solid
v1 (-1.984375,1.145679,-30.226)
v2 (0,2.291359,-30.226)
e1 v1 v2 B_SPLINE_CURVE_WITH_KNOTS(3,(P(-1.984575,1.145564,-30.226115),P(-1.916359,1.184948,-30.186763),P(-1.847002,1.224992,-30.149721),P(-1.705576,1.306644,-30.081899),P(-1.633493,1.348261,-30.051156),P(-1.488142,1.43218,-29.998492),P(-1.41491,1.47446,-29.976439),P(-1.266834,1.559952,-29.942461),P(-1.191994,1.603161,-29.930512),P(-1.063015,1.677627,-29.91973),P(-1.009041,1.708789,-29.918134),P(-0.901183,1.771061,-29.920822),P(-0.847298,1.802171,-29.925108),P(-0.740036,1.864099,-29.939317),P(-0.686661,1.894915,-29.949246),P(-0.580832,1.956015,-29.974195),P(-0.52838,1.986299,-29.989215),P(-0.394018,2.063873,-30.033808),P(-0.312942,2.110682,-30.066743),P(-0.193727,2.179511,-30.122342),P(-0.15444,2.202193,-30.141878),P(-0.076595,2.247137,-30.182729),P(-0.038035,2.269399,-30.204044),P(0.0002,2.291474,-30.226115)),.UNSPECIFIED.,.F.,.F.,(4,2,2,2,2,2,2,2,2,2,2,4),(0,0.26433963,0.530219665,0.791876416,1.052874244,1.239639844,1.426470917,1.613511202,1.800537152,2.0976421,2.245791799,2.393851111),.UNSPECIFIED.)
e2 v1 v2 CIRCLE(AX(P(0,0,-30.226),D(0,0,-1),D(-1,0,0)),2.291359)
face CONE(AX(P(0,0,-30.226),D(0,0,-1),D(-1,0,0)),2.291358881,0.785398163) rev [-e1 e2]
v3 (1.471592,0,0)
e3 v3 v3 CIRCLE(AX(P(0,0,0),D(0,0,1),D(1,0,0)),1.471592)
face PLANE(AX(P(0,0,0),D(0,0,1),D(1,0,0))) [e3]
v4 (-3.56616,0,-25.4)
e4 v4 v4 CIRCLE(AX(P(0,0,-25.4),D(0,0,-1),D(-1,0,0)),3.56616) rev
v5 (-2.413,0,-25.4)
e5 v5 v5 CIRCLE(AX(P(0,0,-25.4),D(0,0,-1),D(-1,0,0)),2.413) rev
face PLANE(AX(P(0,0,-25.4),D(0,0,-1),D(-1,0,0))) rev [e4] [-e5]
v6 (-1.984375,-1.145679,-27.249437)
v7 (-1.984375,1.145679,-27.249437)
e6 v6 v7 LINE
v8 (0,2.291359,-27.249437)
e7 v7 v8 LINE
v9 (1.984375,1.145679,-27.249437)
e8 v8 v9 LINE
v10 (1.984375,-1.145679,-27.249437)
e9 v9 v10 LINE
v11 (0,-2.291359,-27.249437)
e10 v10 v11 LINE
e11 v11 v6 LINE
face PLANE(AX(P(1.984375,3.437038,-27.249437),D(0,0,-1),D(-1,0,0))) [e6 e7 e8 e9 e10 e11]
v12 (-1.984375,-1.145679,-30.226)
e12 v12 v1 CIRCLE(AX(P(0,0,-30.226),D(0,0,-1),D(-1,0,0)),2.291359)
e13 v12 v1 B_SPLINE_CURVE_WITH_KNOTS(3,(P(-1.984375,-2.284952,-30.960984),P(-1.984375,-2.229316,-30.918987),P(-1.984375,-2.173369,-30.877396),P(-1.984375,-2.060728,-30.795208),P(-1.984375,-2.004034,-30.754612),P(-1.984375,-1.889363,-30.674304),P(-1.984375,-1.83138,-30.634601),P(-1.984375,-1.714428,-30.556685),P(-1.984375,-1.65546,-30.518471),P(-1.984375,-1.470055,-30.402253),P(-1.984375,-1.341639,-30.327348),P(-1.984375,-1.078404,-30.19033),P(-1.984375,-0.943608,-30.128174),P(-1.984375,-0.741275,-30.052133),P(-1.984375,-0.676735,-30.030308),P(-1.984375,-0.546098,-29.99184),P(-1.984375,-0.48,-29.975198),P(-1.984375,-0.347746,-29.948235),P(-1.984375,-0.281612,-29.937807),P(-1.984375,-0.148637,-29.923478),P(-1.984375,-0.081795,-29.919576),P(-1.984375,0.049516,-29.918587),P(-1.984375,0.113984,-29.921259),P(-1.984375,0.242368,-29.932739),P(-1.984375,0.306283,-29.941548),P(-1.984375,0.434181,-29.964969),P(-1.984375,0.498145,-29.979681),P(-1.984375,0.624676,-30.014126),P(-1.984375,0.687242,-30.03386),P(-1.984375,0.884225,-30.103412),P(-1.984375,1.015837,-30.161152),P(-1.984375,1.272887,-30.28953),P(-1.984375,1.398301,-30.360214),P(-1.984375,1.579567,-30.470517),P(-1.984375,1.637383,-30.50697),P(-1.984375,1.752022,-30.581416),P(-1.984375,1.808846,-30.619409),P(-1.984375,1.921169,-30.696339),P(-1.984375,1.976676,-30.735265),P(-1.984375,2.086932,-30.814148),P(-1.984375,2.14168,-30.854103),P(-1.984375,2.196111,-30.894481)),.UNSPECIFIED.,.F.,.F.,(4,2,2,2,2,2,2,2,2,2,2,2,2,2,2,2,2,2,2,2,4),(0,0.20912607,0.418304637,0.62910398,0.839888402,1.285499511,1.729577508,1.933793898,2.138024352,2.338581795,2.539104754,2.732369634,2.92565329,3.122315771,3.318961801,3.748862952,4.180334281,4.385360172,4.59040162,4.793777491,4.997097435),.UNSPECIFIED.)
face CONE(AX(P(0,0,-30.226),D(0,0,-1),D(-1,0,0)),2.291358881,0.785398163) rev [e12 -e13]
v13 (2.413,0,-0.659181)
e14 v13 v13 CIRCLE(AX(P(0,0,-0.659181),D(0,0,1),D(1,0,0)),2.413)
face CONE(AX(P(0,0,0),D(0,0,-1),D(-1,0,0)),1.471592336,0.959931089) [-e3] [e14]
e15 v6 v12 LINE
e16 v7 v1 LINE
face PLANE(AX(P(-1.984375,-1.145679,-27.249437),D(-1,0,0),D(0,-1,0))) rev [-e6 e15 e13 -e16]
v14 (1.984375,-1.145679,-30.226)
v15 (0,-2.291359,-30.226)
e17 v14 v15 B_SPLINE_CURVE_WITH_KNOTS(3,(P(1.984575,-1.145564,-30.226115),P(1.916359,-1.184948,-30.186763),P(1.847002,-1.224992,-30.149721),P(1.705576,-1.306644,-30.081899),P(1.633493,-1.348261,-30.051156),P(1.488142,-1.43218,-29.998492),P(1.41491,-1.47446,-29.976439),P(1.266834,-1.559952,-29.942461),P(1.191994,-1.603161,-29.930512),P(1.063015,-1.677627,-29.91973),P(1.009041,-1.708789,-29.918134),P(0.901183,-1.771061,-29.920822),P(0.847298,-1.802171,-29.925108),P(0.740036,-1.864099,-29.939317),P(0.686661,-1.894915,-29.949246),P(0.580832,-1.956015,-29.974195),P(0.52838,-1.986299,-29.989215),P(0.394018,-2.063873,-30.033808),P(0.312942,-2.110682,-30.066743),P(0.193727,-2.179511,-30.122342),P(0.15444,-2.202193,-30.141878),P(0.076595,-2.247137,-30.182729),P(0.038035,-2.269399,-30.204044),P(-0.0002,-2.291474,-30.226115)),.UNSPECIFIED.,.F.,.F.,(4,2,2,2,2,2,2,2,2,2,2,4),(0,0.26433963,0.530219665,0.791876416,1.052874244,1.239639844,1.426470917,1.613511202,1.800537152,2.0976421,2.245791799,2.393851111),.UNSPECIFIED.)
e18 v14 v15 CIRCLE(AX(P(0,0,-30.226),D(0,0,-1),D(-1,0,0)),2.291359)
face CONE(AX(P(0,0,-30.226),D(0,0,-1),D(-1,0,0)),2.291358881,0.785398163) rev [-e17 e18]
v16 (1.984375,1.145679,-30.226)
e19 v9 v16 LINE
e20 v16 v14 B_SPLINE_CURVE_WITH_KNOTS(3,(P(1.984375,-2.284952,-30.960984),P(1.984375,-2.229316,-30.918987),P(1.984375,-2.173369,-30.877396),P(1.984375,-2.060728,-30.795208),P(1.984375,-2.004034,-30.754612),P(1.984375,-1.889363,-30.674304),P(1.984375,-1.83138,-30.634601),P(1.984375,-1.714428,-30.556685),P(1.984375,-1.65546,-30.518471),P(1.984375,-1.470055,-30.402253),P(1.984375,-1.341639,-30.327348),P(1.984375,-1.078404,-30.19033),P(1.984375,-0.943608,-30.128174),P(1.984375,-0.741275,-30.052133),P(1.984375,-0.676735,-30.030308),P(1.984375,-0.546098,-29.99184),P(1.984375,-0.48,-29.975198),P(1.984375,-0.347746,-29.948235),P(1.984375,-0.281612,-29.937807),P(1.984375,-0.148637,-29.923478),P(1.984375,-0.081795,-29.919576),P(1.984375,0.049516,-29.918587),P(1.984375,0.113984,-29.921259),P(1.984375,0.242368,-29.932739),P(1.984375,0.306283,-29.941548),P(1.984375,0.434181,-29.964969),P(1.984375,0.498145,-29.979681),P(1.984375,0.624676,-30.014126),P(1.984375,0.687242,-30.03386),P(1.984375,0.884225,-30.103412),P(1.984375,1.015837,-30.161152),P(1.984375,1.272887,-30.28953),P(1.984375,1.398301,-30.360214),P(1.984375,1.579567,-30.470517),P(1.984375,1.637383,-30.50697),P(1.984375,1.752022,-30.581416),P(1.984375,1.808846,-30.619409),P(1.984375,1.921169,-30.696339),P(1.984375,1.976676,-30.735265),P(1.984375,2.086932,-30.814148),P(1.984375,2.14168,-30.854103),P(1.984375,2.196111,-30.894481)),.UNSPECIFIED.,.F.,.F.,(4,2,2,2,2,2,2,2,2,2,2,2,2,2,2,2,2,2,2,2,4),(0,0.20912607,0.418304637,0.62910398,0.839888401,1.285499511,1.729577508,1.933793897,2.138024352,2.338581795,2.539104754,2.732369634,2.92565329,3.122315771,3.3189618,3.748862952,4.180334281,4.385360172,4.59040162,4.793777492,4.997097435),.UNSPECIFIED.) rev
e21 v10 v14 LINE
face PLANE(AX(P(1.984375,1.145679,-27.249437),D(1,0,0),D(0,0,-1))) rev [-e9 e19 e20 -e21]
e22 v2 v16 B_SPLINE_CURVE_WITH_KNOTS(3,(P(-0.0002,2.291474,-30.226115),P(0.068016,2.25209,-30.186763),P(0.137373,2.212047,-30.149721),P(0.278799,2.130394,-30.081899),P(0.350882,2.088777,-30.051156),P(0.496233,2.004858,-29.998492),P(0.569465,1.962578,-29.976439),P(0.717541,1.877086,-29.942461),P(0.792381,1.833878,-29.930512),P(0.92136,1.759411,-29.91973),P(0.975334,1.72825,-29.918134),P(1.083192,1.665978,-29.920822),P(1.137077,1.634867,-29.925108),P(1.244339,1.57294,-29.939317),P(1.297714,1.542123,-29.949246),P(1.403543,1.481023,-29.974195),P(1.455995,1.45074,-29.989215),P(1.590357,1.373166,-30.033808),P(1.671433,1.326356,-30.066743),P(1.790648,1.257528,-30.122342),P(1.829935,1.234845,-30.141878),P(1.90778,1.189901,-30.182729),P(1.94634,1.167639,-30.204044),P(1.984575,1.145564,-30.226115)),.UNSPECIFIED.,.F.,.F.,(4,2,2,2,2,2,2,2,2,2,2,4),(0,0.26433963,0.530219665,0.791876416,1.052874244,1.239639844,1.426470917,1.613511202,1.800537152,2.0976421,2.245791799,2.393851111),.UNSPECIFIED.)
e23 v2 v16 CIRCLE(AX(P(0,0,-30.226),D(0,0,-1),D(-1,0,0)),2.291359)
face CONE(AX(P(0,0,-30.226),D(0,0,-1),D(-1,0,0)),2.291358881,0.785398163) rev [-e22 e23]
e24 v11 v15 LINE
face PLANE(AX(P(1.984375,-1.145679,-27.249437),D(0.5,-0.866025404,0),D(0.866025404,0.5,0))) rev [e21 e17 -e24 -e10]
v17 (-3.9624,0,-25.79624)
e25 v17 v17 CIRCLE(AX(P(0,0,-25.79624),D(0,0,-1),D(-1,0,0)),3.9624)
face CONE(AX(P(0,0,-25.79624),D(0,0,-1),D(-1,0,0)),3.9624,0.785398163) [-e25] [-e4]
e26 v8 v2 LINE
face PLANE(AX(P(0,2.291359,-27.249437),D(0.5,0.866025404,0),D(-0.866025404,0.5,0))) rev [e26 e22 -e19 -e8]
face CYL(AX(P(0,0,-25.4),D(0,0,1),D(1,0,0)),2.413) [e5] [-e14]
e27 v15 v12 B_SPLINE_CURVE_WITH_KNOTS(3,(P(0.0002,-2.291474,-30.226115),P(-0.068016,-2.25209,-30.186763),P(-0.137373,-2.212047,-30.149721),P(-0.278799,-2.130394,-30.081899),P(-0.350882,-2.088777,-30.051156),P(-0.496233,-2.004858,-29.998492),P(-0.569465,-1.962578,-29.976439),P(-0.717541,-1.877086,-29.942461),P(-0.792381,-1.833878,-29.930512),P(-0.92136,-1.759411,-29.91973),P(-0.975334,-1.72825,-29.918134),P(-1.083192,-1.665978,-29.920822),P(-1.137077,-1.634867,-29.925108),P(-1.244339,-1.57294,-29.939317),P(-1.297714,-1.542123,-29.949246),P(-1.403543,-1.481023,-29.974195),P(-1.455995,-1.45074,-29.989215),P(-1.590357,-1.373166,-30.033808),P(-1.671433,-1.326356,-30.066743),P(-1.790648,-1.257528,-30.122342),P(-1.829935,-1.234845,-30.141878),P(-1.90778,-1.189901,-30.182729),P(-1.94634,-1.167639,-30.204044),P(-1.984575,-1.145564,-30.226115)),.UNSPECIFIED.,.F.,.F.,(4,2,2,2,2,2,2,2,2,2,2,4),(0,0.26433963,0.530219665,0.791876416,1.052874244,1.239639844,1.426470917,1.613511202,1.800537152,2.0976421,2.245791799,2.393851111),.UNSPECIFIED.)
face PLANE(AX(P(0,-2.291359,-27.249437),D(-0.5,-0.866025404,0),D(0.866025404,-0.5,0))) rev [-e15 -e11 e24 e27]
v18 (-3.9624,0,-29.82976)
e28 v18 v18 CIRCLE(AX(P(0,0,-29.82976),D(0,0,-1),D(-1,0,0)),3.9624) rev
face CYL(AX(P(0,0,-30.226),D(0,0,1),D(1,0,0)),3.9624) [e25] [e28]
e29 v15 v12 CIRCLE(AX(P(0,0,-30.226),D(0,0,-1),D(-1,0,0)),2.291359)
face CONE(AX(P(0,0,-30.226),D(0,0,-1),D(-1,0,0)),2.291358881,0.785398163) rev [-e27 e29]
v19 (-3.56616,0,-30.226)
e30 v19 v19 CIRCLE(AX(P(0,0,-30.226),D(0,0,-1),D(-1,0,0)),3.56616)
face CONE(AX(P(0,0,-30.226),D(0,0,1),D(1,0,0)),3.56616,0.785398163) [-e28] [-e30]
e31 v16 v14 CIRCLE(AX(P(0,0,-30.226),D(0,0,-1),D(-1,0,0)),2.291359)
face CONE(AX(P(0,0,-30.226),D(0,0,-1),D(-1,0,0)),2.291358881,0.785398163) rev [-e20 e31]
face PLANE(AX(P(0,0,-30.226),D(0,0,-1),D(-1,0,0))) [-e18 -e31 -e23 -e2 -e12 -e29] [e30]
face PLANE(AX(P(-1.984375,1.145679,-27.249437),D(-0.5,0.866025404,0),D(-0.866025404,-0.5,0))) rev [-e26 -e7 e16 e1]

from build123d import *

# Parameters (mm, degrees)
SKETCH1_R            = 2.413
EXTRUDE1_DEPTH       = 25.4
SKETCH6_R            = 3.9624
EXTRUDE2_DEPTH       = 4.826
CUT_EXTRUDE1_DEPTH   = 2.9765625
CHAMFER1_SIZE        = 0.39624
SKETCH10_R           = 2.413
PARTIAL_THREAD_DEPTH = 3.175
CHAMFER2_SIZE        = 0.09652


with BuildPart() as part:
    # Sketch1 → Extrude1 (new body)
    with BuildSketch(Plane.XY):
        Circle(SKETCH1_R)
    extrude(amount=-EXTRUDE1_DEPTH)

    # Sketch4 → Cut-Revolve1 (revolve, cut)
    with BuildSketch(Plane(origin=(0, 0, 0), x_dir=(0, 0, -1), z_dir=(1, 0, 0)), mode=Mode.PRIVATE) as cut_revolve1_sk:
        Polygon((0.659180743, 2.413), (0, 1.471592336), (0, 2.413), align=None)
    revolve(cut_revolve1_sk.sketch.rotate(Axis((0, 0, 0), (0, 0, -1)), 90), axis=Axis((0, 0, 0), (0, 0, -1)), mode=Mode.SUBTRACT)

    # Sketch6 → Extrude2 (add)
    with BuildSketch(Plane(origin=(0, 0, -25.4), x_dir=(-1, 0, 0), z_dir=(0, 0, -1))):
        Circle(SKETCH6_R)
    extrude(amount=EXTRUDE2_DEPTH)

    # Sketch7 → Cut-Extrude1 (cut)
    with BuildSketch(Plane(origin=(0, 0, -30.226), x_dir=(-1, 0, 0), z_dir=(0, 0, -1))):
        Polygon((0, 2.291358881), (-1.984375, 1.14567944), (-1.984375, -1.14567944), (0, -2.291358881), (1.984375, -1.14567944), (1.984375, 1.14567944), align=None)
    extrude(amount=-CUT_EXTRUDE1_DEPTH, mode=Mode.SUBTRACT)

    # Cut-Extrude2 cone 1 section (through the dimple's axis) → Cut-Extrude2 (revolve, cut)
    with BuildSketch(Plane(origin=(0, 0, -30.226), x_dir=(0, 1, 0), z_dir=(1, 0, 0))):
        Polygon((0, 0), (2.291358881, 0), (0, 2.291358881), align=None)
    revolve(axis=Axis((0, 0, -30.226), (0, 0, 1)), mode=Mode.SUBTRACT)

    # Chamfer1
    chamfer1_edges = [part.edges().sort_by_distance(p)[0] for p in [
        (3.9624, 0, -25.4),
        (3.9624, 0, -30.226),
    ]]
    chamfer(chamfer1_edges, length=CHAMFER1_SIZE)


with BuildPart() as body_2:
    # Sketch10 → partial thread (new body)
    with BuildSketch(Plane.XY.offset(-25.4)):
        Circle(SKETCH10_R)
    extrude(amount=PARTIAL_THREAD_DEPTH)

    # Chamfer2
    chamfer2_edges = [body_2.edges().sort_by_distance(p)[0] for p in [
        (-2.413, 0, -22.225),
    ]]
    chamfer(chamfer2_edges, length=CHAMFER2_SIZE)


with BuildPart() as part_1:
    add(part.part)

    # Combine1: union body 2
    add(body_2.part)


solid = part_1.part
